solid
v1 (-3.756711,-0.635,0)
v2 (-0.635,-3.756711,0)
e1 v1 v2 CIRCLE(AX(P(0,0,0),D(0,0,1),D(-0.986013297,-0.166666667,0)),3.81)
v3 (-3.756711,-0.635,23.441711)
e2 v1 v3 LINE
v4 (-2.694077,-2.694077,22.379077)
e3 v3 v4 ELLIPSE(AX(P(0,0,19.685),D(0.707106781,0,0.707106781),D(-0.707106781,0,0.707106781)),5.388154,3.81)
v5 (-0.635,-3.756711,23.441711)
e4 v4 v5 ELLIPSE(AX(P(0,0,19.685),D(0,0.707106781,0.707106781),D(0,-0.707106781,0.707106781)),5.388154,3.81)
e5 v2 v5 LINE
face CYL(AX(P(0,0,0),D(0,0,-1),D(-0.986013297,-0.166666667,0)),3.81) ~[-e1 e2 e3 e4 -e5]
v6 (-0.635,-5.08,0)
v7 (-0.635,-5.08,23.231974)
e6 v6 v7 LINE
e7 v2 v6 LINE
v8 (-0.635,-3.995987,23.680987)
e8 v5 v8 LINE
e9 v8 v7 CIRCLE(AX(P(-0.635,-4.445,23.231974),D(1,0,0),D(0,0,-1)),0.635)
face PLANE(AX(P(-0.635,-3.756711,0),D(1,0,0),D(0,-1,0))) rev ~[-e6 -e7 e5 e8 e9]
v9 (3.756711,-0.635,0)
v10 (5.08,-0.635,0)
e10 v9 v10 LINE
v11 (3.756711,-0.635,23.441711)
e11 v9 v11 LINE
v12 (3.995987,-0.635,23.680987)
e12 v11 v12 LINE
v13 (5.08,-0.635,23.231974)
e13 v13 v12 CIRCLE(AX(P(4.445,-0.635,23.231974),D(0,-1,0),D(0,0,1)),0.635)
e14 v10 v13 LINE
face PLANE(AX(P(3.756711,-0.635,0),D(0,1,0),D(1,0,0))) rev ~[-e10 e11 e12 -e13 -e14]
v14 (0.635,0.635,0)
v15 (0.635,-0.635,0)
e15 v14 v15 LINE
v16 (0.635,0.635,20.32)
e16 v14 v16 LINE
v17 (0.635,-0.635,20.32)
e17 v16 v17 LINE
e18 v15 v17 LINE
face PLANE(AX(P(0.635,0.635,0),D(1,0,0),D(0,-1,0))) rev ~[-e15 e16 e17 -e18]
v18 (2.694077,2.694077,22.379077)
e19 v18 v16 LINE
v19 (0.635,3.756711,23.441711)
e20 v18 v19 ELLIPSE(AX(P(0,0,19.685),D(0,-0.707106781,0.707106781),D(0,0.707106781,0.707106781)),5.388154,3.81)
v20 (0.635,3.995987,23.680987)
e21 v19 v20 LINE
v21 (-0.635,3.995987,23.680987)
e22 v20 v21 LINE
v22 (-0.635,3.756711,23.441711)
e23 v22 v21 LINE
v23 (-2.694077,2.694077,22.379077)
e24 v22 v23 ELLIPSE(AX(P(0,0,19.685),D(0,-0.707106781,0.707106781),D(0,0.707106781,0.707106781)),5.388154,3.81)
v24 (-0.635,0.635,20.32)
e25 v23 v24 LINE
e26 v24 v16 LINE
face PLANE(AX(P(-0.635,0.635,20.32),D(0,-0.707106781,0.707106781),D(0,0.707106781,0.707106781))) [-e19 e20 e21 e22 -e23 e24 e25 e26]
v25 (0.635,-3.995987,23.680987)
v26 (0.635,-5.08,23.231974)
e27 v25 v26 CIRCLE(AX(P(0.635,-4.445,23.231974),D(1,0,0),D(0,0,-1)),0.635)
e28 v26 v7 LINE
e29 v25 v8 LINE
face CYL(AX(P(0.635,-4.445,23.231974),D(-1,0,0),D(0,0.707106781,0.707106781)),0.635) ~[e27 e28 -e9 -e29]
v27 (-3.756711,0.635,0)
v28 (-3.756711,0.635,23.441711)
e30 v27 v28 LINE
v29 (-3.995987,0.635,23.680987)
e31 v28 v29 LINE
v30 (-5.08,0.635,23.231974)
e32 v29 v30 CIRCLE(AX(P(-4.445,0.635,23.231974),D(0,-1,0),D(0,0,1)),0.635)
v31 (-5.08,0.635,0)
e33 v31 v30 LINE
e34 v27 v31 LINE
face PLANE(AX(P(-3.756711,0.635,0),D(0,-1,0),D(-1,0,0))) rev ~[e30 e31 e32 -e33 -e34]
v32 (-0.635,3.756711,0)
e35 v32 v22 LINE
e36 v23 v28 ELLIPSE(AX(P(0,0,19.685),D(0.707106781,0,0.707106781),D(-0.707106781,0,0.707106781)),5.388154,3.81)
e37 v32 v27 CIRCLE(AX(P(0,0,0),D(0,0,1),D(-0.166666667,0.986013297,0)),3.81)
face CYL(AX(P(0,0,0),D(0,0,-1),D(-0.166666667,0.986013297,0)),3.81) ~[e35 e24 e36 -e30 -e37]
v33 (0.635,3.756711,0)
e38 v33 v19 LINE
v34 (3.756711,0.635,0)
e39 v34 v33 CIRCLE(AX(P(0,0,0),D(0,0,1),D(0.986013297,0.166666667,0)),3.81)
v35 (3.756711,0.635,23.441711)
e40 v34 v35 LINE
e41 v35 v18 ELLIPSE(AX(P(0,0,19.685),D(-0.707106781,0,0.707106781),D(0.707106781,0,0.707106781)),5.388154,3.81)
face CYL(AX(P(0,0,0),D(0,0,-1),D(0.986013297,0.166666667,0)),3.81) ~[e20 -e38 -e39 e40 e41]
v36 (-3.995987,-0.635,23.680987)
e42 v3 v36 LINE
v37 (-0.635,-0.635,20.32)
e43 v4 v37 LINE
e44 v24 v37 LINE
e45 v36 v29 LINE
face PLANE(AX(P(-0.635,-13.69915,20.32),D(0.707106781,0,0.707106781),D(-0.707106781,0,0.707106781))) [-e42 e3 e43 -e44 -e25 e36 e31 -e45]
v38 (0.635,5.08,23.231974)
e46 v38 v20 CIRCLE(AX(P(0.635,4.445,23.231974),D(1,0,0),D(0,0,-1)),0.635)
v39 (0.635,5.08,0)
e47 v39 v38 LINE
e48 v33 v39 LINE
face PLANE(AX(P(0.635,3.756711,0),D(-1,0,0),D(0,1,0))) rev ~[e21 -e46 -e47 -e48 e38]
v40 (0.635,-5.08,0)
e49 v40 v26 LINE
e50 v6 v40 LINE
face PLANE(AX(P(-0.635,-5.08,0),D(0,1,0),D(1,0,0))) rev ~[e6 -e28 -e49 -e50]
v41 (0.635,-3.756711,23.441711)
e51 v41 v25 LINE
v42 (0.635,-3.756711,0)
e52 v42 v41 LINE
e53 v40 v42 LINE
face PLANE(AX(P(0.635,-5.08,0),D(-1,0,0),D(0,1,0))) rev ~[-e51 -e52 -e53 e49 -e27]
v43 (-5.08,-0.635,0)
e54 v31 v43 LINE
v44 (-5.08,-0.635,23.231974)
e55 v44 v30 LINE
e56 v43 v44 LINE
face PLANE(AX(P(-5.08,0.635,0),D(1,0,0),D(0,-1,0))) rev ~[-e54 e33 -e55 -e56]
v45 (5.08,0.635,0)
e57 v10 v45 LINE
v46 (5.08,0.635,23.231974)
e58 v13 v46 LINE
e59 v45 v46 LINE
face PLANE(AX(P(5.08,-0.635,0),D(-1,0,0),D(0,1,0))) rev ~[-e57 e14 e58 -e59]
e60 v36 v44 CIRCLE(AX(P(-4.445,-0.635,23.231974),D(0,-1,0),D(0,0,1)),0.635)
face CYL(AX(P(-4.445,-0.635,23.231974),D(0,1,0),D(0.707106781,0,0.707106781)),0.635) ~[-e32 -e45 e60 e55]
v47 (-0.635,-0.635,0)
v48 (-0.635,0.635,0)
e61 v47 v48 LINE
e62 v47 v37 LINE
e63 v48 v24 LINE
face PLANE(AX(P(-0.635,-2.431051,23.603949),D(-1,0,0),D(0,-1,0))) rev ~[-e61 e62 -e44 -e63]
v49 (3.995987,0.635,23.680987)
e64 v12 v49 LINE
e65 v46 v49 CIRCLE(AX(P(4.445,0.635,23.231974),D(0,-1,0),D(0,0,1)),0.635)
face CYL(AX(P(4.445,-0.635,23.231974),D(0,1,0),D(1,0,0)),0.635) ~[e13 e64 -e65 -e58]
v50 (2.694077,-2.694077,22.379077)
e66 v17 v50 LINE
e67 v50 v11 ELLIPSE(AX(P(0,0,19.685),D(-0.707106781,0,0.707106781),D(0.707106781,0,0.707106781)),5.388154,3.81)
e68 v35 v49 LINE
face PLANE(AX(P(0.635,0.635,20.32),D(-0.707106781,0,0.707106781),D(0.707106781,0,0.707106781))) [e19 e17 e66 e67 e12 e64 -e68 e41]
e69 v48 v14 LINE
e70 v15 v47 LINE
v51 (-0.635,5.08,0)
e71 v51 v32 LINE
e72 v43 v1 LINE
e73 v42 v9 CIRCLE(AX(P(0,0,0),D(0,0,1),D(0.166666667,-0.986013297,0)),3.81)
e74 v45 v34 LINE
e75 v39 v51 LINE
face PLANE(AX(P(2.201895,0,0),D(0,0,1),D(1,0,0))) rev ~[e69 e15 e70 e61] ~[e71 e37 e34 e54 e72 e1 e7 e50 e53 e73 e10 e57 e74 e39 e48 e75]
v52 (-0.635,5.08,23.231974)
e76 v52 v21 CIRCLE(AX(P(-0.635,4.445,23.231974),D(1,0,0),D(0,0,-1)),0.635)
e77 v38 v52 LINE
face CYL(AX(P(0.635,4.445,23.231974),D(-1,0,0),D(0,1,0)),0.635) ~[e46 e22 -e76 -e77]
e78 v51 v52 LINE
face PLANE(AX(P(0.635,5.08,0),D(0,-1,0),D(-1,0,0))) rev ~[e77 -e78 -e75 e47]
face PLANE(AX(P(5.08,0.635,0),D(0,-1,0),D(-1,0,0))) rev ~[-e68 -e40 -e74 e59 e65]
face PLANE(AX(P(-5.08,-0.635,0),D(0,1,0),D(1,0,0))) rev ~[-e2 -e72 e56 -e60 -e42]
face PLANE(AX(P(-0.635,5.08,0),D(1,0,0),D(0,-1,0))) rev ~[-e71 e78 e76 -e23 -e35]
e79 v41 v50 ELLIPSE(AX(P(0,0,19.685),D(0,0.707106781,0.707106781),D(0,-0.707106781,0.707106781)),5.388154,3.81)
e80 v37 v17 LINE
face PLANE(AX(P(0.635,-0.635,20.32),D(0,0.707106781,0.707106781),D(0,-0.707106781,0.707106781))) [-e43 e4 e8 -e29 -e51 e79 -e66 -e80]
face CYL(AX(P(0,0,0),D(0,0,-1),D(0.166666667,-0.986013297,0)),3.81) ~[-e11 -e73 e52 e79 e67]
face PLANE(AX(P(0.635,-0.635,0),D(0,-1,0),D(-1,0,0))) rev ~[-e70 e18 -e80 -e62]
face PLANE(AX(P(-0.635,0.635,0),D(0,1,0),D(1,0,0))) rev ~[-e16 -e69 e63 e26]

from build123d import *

# Parameters (mm, degrees)
F1_DEPTH     = 25.4
F2_T1_DEPTH  = 1.27
F2_T3_DEPTH  = 1.27
F2_T9_DEPTH  = 14.3341495789
F2_S10_R     = 3.81
F2_T11_DEPTH = 10
F2_T15_DEPTH = 14.3341495789
F2_S16_R     = 3.81
F2_T17_DEPTH = 10
F2_T24_DEPTH = 14.3341495789
F2_S25_R     = 3.81
F2_T26_DEPTH = 10
F2_T30_DEPTH = 14.3341495789
F2_S31_R     = 3.81
F2_T32_DEPTH = 10
F2_T39_DEPTH = 14.3341495789
F2_S40_R     = 3.81
F2_T41_DEPTH = 10
F2_T45_DEPTH = 14.3341495789
F2_S46_R     = 3.81
F2_T47_DEPTH = 10
F2_T54_DEPTH = 14.3341495789
F2_S55_R     = 3.81
F2_T56_DEPTH = 10
F2_T60_DEPTH = 14.3341495789
F2_S61_R     = 3.81
F2_T62_DEPTH = 10
F3_R         = 0.635


# Not quite as in the source:
# - a fillet or chamfer that OpenCascade refuses, or shapes differently, is made with other operations: its cross-section is extruded or revolved along the edge and cut away or added


with BuildPart() as f1:
    # F0 (on Top) → F1 (new body)
    with BuildSketch(Plane.XY):
        with BuildLine():
            ThreePointArc((3.7567106623, -0.635), (3.7966542918, -0.3186160517), (3.81, 0))
            ThreePointArc((3.81, 0), (3.7966542918, 0.3186160517), (3.7567106623, 0.635))
            Line((3.7567106623, 0.635), (0.635, 0.635))
            Line((0.635, 0.635), (0.635, -0.635))
            Line((0.635, -0.635), (3.7567106623, -0.635))
        make_face()
        with BuildLine():
            ThreePointArc((3.7567106623, 0.635), (3.7966542918, 0.3186160517), (3.81, 0))
            ThreePointArc((3.81, 0), (3.7966542918, -0.3186160517), (3.7567106623, -0.635))
            Line((3.7567106623, -0.635), (5.08, -0.635))
            Line((5.08, -0.635), (5.08, 0.635))
            Line((5.08, 0.635), (3.7567106623, 0.635))
        make_face()
        with BuildLine():
            Line((0.635, 0.635), (3.7567106623, 0.635))
            ThreePointArc((3.7567106623, 0.635), (2.6940768363, 2.6940768363), (0.635, 3.7567106623))
            Line((0.635, 3.7567106623), (0.635, 0.635))
        make_face()
        with BuildLine():
            ThreePointArc((0.635, -3.7567106623), (2.6940768363, -2.6940768363), (3.7567106623, -0.635))
            Line((3.7567106623, -0.635), (0.635, -0.635))
            Line((0.635, -0.635), (0.635, -3.7567106623))
        make_face()
        with BuildLine():
            Line((0.635, 0.635), (0.635, 3.7567106623))
            ThreePointArc((0.635, 3.7567106623), (0, 3.81), (-0.635, 3.7567106623))
            Line((-0.635, 3.7567106623), (-0.635, 0.635))
            Line((-0.635, 0.635), (0.635, 0.635))
        make_face()
        with BuildLine():
            ThreePointArc((-0.635, 3.7567106623), (0, 3.81), (0.635, 3.7567106623))
            Line((0.635, 3.7567106623), (0.635, 5.08))
            Line((0.635, 5.08), (-0.635, 5.08))
            Line((-0.635, 5.08), (-0.635, 3.7567106623))
        make_face()
        with BuildLine():
            Line((0.635, -5.08), (0.635, -3.7567106623))
            ThreePointArc((0.635, -3.7567106623), (0, -3.81), (-0.635, -3.7567106623))
            Line((-0.635, -3.7567106623), (-0.635, -5.08))
            Line((-0.635, -5.08), (0.635, -5.08))
        make_face()
        with BuildLine():
            ThreePointArc((-0.635, -3.7567106623), (0, -3.81), (0.635, -3.7567106623))
            Line((0.635, -3.7567106623), (0.635, -0.635))
            Line((0.635, -0.635), (-0.635, -0.635))
            Line((-0.635, -0.635), (-0.635, -3.7567106623))
        make_face()
        with BuildLine():
            Line((-0.635, 0.635), (-0.635, 3.7567106623))
            ThreePointArc((-0.635, 3.7567106623), (-2.6940768363, 2.6940768363), (-3.7567106623, 0.635))
            Line((-3.7567106623, 0.635), (-0.635, 0.635))
        make_face()
        with BuildLine():
            Line((-0.635, -0.635), (-0.635, 0.635))
            Line((-0.635, 0.635), (-3.7567106623, 0.635))
            ThreePointArc((-3.7567106623, 0.635), (-3.81, 0), (-3.7567106623, -0.635))
            Line((-3.7567106623, -0.635), (-0.635, -0.635))
        make_face()
        with BuildLine():
            ThreePointArc((-3.7567106623, -0.635), (-2.6940768363, -2.6940768363), (-0.635, -3.7567106623))
            Line((-0.635, -3.7567106623), (-0.635, -0.635))
            Line((-0.635, -0.635), (-3.7567106623, -0.635))
        make_face()
        with BuildLine():
            ThreePointArc((-3.7567106623, -0.635), (-3.81, 0), (-3.7567106623, 0.635))
            Line((-3.7567106623, 0.635), (-5.08, 0.635))
            Line((-5.08, 0.635), (-5.08, -0.635))
            Line((-5.08, -0.635), (-3.7567106623, -0.635))
        make_face()
    extrude(amount=F1_DEPTH)

    # F2: chamfer of 5.08 on 4 edges, made by hand

    # F2_s2 → F2_t1 (cut)
    with BuildSketch(Plane.YZ.offset(-0.635)):
        Polygon((0.635, 20.32), (5.715, 25.4), (0.635, 25.4), align=None)
        Polygon((-0.635, 20.32), (-5.715, 25.4), (-0.635, 25.4), align=None)
    extrude(amount=F2_T1_DEPTH, mode=Mode.SUBTRACT)

    # F2_s4 → F2_t3 (cut)
    with BuildSketch(Plane.XZ.offset(-0.635)):
        Polygon((-0.635, 20.32), (-5.715, 25.4), (-0.635, 25.4), align=None)
        Polygon((0.635, 20.32), (5.715, 25.4), (0.635, 25.4), align=None)
    extrude(amount=F2_T3_DEPTH, mode=Mode.SUBTRACT)


with BuildPart() as f2_tool7:
    # F2_s8 → F2_t9 (new body)
    with BuildSketch(Plane.XZ.offset(0.635)):
        Polygon((-0.635, 20.32), (-5.715, 25.4), (-0.635, 25.4), align=None)
    extrude(amount=-F2_T9_DEPTH)

    # F2_s10 → F2_t11 (intersect, symmetric)
    with BuildSketch(Plane.XY.offset(22.9)):
        Circle(F2_S10_R)
    extrude(amount=F2_T11_DEPTH, both=True, mode=Mode.INTERSECT)

    split(bisect_by=Plane.XZ.offset(-0.635), keep=Keep.BOTTOM)


with BuildPart() as f2_tool13:
    # F2_s14 → F2_t15 (new body)
    with BuildSketch(Plane.YZ.offset(-13.6991495789)):
        Polygon((0.635, 20.32), (5.715, 25.4), (0.635, 25.4), align=None)
    extrude(amount=F2_T15_DEPTH)

    # F2_s16 → F2_t17 (intersect, symmetric)
    with BuildSketch(Plane.XY.offset(22.9)):
        Circle(F2_S16_R)
    extrude(amount=F2_T17_DEPTH, both=True, mode=Mode.INTERSECT)

    split(bisect_by=Plane.YZ.offset(-0.635), keep=Keep.BOTTOM)


with BuildPart() as f2_tool7_1:
    add(f2_tool7.part)

    # F2_t19: intersect F2_tool13
    add(f2_tool13.part, mode=Mode.INTERSECT)


with BuildPart() as f1_1:
    add(f1.part)

    # F2_t5: cut F2_tool7
    add(f2_tool7_1.part, mode=Mode.SUBTRACT)


with BuildPart() as f2_tool22:
    # F2_s23 → F2_t24 (new body)
    with BuildSketch(Plane.YZ.offset(-0.635)):
        Polygon((0.635, 20.32), (5.715, 25.4), (0.635, 25.4), align=None)
    extrude(amount=F2_T24_DEPTH)

    # F2_s25 → F2_t26 (intersect, symmetric)
    with BuildSketch(Plane.XY.offset(22.9)):
        Circle(F2_S25_R)
    extrude(amount=F2_T26_DEPTH, both=True, mode=Mode.INTERSECT)

    split(bisect_by=Plane.YZ.offset(0.635), keep=Keep.TOP)


with BuildPart() as f2_tool28:
    # F2_s29 → F2_t30 (new body)
    with BuildSketch(Plane.XZ.offset(-13.6991495789)):
        Polygon((0.635, 20.32), (5.715, 25.4), (0.635, 25.4), align=None)
    extrude(amount=F2_T30_DEPTH)

    # F2_s31 → F2_t32 (intersect, symmetric)
    with BuildSketch(Plane.XY.offset(22.9)):
        Circle(F2_S31_R)
    extrude(amount=F2_T32_DEPTH, both=True, mode=Mode.INTERSECT)

    split(bisect_by=Plane.XZ.offset(-0.635), keep=Keep.BOTTOM)


with BuildPart() as f2_tool22_1:
    add(f2_tool22.part)

    # F2_t34: intersect F2_tool28
    add(f2_tool28.part, mode=Mode.INTERSECT)


with BuildPart() as f1_2:
    add(f1_1.part)

    # F2_t20: cut F2_tool22
    add(f2_tool22_1.part, mode=Mode.SUBTRACT)


with BuildPart() as f2_tool37:
    # F2_s38 → F2_t39 (new body)
    with BuildSketch(Plane.YZ.offset(0.635)):
        Polygon((-0.635, 20.32), (-5.715, 25.4), (-0.635, 25.4), align=None)
    extrude(amount=-F2_T39_DEPTH)

    # F2_s40 → F2_t41 (intersect, symmetric)
    with BuildSketch(Plane.XY.offset(22.9)):
        Circle(F2_S40_R)
    extrude(amount=F2_T41_DEPTH, both=True, mode=Mode.INTERSECT)

    split(bisect_by=Plane.YZ.offset(-0.635), keep=Keep.BOTTOM)


with BuildPart() as f2_tool43:
    # F2_s44 → F2_t45 (new body)
    with BuildSketch(Plane.XZ.offset(13.6991495789)):
        Polygon((-0.635, 20.32), (-5.715, 25.4), (-0.635, 25.4), align=None)
    extrude(amount=-F2_T45_DEPTH)

    # F2_s46 → F2_t47 (intersect, symmetric)
    with BuildSketch(Plane.XY.offset(22.9)):
        Circle(F2_S46_R)
    extrude(amount=F2_T47_DEPTH, both=True, mode=Mode.INTERSECT)

    split(bisect_by=Plane.XZ.offset(0.635), keep=Keep.TOP)


with BuildPart() as f2_tool37_1:
    add(f2_tool37.part)

    # F2_t49: intersect F2_tool43
    add(f2_tool43.part, mode=Mode.INTERSECT)


with BuildPart() as f1_3:
    add(f1_2.part)

    # F2_t35: cut F2_tool37
    add(f2_tool37_1.part, mode=Mode.SUBTRACT)


with BuildPart() as f2_tool52:
    # F2_s53 → F2_t54 (new body)
    with BuildSketch(Plane.YZ.offset(13.6991495789)):
        Polygon((-0.635, 20.32), (-5.715, 25.4), (-0.635, 25.4), align=None)
    extrude(amount=-F2_T54_DEPTH)

    # F2_s55 → F2_t56 (intersect, symmetric)
    with BuildSketch(Plane.XY.offset(22.9)):
        Circle(F2_S55_R)
    extrude(amount=F2_T56_DEPTH, both=True, mode=Mode.INTERSECT)

    split(bisect_by=Plane.YZ.offset(0.635), keep=Keep.TOP)


with BuildPart() as f2_tool58:
    # F2_s59 → F2_t60 (new body)
    with BuildSketch(Plane.XZ.offset(-0.635)):
        Polygon((0.635, 20.32), (5.715, 25.4), (0.635, 25.4), align=None)
    extrude(amount=F2_T60_DEPTH)

    # F2_s61 → F2_t62 (intersect, symmetric)
    with BuildSketch(Plane.XY.offset(22.9)):
        Circle(F2_S61_R)
    extrude(amount=F2_T62_DEPTH, both=True, mode=Mode.INTERSECT)

    split(bisect_by=Plane.XZ.offset(0.635), keep=Keep.TOP)


with BuildPart() as f2_tool52_1:
    add(f2_tool52.part)

    # F2_t64: intersect F2_tool58
    add(f2_tool58.part, mode=Mode.INTERSECT)


with BuildPart() as f1_4:
    add(f1_3.part)

    # F2_t50: cut F2_tool52
    add(f2_tool52_1.part, mode=Mode.SUBTRACT)

    # F3
    f3_edges = [f1_4.edges().sort_by_distance(p)[0] for p in [
        (5.08, 0, 24.765),
        (0, 5.08, 24.765),
        (-5.08, 0, 24.765),
        (0, -5.08, 24.765),
    ]]
    fillet(f3_edges, radius=F3_R)


solid = f1_4.part
